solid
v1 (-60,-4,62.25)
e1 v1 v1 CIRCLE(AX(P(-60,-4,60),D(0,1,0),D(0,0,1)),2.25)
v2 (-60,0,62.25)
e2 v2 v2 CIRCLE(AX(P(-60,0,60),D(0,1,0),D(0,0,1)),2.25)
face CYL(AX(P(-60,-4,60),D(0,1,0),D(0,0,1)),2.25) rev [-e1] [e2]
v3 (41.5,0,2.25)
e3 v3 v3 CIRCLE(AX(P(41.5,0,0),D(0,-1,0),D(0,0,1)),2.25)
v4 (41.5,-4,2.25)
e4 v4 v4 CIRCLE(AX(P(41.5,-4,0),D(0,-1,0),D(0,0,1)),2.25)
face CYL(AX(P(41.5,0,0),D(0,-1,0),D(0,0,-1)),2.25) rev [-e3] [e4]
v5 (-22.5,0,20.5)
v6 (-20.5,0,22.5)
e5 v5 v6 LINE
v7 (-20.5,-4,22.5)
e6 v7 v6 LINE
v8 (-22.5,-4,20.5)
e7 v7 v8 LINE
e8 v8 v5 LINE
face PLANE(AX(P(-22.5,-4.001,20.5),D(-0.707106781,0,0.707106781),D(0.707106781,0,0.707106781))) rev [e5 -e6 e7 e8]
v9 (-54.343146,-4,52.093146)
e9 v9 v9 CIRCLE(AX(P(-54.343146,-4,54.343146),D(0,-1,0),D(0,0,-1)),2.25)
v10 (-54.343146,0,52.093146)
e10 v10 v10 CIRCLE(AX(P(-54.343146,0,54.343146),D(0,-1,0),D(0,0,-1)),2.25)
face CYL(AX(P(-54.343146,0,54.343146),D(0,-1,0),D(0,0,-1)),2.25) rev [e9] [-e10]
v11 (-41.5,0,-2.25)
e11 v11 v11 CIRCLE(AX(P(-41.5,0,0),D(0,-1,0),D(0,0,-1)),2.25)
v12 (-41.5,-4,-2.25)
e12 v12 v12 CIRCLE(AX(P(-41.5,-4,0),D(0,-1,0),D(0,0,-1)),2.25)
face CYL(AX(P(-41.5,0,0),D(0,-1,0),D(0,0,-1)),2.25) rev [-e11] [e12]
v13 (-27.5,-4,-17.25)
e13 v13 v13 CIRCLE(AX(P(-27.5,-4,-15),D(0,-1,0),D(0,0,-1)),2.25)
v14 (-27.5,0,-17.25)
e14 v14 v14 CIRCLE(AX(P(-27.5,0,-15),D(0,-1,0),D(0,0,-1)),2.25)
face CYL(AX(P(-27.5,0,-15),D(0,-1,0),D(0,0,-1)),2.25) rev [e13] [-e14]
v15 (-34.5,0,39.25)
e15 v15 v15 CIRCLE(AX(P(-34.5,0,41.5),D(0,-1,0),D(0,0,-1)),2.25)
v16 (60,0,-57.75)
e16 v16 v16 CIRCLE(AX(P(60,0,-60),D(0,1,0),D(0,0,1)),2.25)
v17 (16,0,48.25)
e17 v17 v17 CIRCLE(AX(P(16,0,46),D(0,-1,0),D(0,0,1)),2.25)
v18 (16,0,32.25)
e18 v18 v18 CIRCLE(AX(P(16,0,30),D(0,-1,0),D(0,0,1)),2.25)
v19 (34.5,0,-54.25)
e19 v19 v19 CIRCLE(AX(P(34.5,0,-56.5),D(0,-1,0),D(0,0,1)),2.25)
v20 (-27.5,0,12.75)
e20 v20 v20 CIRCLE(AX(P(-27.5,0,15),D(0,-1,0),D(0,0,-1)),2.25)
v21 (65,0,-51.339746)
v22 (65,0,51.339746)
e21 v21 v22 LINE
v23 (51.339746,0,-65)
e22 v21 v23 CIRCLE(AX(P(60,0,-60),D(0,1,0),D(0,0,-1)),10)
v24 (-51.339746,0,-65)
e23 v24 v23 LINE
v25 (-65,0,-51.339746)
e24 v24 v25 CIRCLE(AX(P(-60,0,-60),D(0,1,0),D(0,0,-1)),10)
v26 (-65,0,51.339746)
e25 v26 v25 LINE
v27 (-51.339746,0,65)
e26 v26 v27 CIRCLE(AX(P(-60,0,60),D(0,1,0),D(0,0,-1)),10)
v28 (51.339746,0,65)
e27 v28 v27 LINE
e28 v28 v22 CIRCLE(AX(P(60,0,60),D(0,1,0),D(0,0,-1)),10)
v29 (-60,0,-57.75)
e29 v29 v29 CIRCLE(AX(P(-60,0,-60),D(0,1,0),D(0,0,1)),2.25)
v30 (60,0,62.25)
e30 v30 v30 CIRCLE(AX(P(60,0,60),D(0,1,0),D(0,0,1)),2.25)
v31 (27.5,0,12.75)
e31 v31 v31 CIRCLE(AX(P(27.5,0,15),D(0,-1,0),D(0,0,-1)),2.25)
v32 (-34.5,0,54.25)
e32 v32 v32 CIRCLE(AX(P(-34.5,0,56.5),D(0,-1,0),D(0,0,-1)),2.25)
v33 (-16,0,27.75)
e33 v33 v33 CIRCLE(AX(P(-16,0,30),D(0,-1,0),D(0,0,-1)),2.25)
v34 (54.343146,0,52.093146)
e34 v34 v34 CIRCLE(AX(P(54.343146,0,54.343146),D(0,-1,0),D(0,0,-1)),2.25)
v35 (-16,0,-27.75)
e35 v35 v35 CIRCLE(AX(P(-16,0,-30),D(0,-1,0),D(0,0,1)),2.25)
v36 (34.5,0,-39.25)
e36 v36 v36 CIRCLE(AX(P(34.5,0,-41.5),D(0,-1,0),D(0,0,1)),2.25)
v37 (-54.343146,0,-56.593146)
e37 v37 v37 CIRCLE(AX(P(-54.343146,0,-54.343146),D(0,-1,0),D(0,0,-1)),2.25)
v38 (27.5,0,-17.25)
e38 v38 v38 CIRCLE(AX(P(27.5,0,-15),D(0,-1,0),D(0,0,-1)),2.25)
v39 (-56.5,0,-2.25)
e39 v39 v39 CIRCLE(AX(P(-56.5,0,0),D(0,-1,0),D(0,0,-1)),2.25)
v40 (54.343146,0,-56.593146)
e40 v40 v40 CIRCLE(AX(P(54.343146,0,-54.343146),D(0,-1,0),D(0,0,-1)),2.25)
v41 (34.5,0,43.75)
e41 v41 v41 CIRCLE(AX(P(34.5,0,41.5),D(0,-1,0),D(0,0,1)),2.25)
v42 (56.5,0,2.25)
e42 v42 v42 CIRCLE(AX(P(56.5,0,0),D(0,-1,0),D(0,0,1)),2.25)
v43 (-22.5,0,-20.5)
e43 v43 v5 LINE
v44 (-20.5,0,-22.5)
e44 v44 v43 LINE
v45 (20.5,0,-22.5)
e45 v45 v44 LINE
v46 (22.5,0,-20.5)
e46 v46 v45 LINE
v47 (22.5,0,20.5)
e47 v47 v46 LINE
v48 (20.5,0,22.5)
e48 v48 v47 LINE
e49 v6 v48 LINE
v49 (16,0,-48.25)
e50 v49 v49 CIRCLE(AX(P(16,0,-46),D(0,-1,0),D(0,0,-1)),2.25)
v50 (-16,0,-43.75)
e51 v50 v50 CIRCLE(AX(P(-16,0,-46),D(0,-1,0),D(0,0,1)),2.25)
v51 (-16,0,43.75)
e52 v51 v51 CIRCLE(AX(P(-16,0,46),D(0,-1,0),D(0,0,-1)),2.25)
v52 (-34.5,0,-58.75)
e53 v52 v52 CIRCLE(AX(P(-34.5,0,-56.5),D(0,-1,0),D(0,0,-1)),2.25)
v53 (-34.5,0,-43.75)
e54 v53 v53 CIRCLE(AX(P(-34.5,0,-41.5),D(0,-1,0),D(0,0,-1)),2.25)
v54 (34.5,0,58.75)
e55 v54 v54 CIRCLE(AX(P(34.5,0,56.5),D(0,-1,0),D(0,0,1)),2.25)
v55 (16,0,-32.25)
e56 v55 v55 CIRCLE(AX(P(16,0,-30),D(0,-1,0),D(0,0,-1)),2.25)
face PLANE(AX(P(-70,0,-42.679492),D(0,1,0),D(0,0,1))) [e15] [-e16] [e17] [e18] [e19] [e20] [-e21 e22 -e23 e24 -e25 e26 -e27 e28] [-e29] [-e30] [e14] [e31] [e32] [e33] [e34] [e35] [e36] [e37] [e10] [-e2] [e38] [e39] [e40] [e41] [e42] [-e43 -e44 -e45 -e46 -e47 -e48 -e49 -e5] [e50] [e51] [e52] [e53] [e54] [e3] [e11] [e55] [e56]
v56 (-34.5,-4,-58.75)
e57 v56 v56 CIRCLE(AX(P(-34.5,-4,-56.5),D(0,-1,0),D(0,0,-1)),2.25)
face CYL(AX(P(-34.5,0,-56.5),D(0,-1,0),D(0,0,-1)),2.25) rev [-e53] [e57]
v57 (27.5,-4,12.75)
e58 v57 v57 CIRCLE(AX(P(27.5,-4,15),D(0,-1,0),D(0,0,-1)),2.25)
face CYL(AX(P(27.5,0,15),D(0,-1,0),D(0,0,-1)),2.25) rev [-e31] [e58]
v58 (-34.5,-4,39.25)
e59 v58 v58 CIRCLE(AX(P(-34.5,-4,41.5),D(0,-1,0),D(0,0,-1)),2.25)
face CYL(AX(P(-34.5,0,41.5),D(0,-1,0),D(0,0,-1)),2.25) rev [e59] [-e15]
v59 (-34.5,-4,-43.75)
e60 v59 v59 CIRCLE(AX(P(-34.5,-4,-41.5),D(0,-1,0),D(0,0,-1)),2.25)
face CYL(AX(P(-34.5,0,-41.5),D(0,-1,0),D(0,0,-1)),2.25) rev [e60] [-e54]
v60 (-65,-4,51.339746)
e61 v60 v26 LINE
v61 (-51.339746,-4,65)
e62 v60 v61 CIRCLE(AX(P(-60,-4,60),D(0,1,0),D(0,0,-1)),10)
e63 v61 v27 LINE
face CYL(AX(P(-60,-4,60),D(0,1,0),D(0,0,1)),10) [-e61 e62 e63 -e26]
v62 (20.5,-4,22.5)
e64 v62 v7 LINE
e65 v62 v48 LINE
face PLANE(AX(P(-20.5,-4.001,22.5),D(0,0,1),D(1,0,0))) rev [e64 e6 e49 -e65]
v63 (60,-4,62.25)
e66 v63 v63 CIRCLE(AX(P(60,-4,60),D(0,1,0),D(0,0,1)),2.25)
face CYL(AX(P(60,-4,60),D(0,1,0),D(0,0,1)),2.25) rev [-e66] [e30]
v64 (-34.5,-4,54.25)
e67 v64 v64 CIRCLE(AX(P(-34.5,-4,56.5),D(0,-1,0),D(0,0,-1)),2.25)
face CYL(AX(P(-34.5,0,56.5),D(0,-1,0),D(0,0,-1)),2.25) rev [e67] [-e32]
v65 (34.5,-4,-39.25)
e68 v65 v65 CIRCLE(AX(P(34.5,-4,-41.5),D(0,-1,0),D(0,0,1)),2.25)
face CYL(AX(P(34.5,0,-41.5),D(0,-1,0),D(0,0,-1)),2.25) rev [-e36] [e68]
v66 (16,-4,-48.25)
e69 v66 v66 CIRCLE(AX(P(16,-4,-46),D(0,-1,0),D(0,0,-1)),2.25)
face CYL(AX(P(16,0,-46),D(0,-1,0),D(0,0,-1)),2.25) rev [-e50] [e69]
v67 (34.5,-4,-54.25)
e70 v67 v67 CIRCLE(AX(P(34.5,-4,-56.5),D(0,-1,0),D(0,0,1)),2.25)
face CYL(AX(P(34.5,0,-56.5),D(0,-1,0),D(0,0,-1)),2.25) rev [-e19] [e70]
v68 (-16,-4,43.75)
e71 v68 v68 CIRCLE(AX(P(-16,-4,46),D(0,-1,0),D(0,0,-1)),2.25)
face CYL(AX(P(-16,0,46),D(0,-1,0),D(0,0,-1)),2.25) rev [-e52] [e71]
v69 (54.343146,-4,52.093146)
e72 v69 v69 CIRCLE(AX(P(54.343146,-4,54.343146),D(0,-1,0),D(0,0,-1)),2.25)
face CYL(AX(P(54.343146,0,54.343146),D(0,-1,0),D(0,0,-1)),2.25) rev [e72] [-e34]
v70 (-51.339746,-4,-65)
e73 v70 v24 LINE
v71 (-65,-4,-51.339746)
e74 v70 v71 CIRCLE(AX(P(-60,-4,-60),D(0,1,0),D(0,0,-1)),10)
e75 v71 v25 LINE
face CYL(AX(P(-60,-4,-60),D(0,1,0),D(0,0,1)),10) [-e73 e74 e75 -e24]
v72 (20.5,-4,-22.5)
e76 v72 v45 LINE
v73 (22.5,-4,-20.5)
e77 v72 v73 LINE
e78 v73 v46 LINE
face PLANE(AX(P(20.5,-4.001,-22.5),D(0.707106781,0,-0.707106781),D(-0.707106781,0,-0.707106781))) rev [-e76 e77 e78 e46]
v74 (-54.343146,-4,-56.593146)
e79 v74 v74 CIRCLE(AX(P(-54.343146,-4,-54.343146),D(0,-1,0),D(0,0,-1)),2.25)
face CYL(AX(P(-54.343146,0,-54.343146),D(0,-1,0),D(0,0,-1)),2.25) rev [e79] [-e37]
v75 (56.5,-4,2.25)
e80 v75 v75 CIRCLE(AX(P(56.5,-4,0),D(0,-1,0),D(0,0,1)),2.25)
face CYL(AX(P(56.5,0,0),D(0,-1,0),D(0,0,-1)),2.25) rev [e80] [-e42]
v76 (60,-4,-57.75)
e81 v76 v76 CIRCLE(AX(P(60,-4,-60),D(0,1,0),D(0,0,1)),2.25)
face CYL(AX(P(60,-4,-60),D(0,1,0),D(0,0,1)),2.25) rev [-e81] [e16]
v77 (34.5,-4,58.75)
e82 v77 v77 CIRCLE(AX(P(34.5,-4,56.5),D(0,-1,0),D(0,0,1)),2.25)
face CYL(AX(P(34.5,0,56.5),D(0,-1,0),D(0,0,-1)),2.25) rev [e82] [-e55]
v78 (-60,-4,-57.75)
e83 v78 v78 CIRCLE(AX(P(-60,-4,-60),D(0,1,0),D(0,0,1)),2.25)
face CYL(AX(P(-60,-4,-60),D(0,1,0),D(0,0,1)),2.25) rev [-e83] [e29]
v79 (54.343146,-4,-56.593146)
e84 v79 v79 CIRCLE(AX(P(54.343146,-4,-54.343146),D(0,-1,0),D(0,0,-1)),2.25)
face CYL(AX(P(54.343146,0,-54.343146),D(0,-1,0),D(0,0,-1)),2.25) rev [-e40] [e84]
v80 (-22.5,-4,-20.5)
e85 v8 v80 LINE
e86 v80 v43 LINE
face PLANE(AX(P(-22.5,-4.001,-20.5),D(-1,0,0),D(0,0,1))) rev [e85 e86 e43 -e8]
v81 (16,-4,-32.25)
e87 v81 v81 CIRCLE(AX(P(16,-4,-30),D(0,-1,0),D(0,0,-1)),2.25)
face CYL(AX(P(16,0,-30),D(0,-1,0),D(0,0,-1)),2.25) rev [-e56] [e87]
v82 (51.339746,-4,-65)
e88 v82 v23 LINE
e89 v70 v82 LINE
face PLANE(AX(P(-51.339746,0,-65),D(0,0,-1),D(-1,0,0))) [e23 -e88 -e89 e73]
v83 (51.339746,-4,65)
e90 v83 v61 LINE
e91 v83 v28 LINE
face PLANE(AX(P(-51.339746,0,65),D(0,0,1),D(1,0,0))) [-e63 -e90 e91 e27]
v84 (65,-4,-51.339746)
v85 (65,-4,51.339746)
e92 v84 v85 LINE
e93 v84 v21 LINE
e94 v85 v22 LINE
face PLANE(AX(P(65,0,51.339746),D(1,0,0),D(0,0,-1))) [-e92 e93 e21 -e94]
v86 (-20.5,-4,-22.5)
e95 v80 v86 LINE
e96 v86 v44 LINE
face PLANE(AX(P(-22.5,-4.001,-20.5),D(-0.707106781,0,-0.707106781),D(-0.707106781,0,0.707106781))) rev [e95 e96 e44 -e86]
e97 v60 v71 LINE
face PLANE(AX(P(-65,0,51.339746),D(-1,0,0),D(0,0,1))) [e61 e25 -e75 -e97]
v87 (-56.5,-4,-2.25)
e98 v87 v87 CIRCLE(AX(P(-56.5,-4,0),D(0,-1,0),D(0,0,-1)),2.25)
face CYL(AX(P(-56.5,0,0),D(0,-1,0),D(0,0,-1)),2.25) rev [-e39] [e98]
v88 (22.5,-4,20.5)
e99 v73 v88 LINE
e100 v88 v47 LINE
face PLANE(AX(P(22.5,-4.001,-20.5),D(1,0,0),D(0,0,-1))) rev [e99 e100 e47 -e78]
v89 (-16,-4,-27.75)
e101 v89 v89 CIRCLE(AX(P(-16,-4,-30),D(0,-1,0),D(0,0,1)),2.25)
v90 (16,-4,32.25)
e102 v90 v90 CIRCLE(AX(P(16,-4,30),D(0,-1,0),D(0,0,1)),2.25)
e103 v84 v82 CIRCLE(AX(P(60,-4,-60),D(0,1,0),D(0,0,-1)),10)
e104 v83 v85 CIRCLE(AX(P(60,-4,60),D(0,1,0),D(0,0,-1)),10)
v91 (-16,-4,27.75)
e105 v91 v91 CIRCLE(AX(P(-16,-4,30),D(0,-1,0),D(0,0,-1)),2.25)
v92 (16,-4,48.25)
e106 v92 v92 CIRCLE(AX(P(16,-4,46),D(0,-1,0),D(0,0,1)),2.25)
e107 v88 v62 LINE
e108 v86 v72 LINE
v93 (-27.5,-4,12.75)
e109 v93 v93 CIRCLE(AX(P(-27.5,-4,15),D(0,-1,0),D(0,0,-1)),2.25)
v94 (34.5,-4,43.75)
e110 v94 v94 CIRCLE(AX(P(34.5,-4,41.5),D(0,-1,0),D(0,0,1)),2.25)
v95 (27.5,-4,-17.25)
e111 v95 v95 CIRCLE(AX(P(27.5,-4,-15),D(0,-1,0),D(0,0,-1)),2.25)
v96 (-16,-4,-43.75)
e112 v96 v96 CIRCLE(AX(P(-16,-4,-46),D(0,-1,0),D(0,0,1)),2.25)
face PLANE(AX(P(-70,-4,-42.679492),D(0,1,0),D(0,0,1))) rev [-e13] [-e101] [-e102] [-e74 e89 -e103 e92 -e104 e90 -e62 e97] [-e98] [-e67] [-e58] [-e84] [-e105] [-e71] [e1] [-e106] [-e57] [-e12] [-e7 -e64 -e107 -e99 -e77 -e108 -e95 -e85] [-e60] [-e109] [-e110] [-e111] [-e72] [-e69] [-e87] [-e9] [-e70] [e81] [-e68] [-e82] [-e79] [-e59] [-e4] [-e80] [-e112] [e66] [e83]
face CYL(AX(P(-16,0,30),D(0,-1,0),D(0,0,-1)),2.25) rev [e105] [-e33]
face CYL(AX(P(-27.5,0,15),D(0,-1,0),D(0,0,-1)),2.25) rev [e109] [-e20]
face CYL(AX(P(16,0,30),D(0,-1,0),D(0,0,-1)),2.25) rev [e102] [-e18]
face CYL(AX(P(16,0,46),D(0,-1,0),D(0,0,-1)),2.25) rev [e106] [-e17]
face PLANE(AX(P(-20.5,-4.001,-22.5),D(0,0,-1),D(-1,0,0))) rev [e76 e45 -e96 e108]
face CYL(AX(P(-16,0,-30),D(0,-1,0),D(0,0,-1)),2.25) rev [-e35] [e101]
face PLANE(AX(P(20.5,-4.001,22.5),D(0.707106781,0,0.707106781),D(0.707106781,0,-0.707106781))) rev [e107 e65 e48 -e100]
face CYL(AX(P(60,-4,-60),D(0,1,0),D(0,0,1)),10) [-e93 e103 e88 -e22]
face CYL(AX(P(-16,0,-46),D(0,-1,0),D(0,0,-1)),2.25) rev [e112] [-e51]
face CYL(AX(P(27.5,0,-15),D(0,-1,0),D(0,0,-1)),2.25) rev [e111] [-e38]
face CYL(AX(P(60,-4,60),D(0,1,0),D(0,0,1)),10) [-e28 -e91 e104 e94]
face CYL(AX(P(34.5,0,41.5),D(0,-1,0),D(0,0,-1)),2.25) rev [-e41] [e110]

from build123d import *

# Parameters (mm, degrees)
SKETCH1_R          = 2.25
BASE_FLANGE1_DEPTH = 4
CUT_EXTRUDE1_REACH = 101.076
SKETCH5_R          = 2.25
CUT_EXTRUDE2_DEPTH = 100.075728612
SKETCH6_R          = 2.25
CUT_EXTRUDE3_DEPTH = 100.075728612
SKETCH8_W          = 5
SKETCH8_H          = 102.679491924
SKETCH8_W_2        = 102.679491924
SKETCH8_H_2        = 5
TAB1_DEPTH         = 4
SKETCH7_R          = 2.25
CUT_EXTRUDE4_DEPTH = 100.075728612
SKETCH9_R          = 2.25
CUT_EXTRUDE5_DEPTH = 100.075728612


# Sheet-metal steps are written as plain solids
with BuildPart() as part:
    # Sketch1 → Base-Flange1 (new body)
    with BuildSketch(Plane(origin=(0, 0, 0), x_dir=(1, 0, 0), z_dir=(0, 1, 0))):
        with BuildLine():
            Line((-60, 0), (-60, 42.679491924))
            ThreePointArc((-60, 42.679491924), (-61.339745962, 47.679491924), (-65, 51.339745962))
            ThreePointArc((-65, 51.339745962), (-67.071067812, 67.071067812), (-51.339745962, 65))
            ThreePointArc((-51.339745962, 65), (-47.679491924, 61.339745962), (-42.679491924, 60))
            Line((-42.679491924, 60), (0, 60))
            Line((0, 60), (42.679491924, 60))
            ThreePointArc((42.679491924, 60), (47.679491924, 61.339745962), (51.339745962, 65))
            ThreePointArc((51.339745962, 65), (67.071067812, 67.071067812), (65, 51.339745962))
            ThreePointArc((65, 51.339745962), (61.339745962, 47.679491924), (60, 42.679491924))
            Line((60, 42.679491924), (60, 0))
            Line((60, 0), (60, -42.679491924))
            ThreePointArc((60, -42.679491924), (61.339745962, -47.679491924), (65, -51.339745962))
            ThreePointArc((65, -51.339745962), (67.071067812, -67.071067812), (51.339745962, -65))
            ThreePointArc((51.339745962, -65), (47.679491924, -61.339745962), (42.679491924, -60))
            Line((42.679491924, -60), (0, -60))
            Line((0, -60), (-42.679491924, -60))
            ThreePointArc((-42.679491924, -60), (-47.679491924, -61.339745962), (-51.339745962, -65))
            ThreePointArc((-51.339745962, -65), (-67.071067812, -67.071067812), (-65, -51.339745962))
            ThreePointArc((-65, -51.339745962), (-61.339745962, -47.679491924), (-60, -42.679491924))
            Line((-60, -42.679491924), (-60, 0))
        make_face()
        with Locations(Location((-60, 60, 0), (0, 0, 270))):
            Circle(SKETCH1_R, mode=Mode.SUBTRACT)
        with Locations(Location((60, 60, 0), (0, 0, 270))):
            Circle(SKETCH1_R, mode=Mode.SUBTRACT)
        with Locations(Location((60, -60, 0), (0, 0, 270))):
            Circle(SKETCH1_R, mode=Mode.SUBTRACT)
        with Locations(Location((-60, -60, 0), (0, 0, 270))):
            Circle(SKETCH1_R, mode=Mode.SUBTRACT)
    extrude(amount=-BASE_FLANGE1_DEPTH)

    # Sketch4 → Cut-Extrude1 (cut, up to next)
    with BuildSketch(Plane(origin=(0, 0, 0), x_dir=(1, 0, 0), z_dir=(0, 1, 0)), mode=Mode.PRIVATE) as cut_extrude1_sk1:
        Polygon((-20.5, 22.5), (20.5, 22.5), (22.5, 20.5), (22.5, -20.5), (20.5, -22.5), (-20.5, -22.5), (-22.5, -20.5), (-22.5, 20.5), align=None)
    cut_extrude1_tool1 = extrude(cut_extrude1_sk1.sketch, amount=-CUT_EXTRUDE1_REACH, mode=Mode.PRIVATE) & part.part
    add(cut_extrude1_tool1.solids().sort_by_distance((0, 0, 0))[0], mode=Mode.SUBTRACT)

    # Sketch5 → Cut-Extrude2 (cut, through all)
    with BuildSketch(Plane.XZ.offset(4)):
        with Locations(Location((-54.343145751, 54.343145751, 0), (0, 0, 270))):
            Circle(SKETCH5_R)
        with Locations(Location((54.343145751, 54.343145751, 0), (0, 0, 270))):
            Circle(SKETCH5_R)
        with Locations(Location((54.343145751, -54.343145751, 0), (0, 0, 270))):
            Circle(SKETCH5_R)
        with Locations(Location((-54.343145751, -54.343145751, 0), (0, 0, 270))):
            Circle(SKETCH5_R)
    extrude(amount=-CUT_EXTRUDE2_DEPTH, mode=Mode.SUBTRACT)

    # Sketch6 → Cut-Extrude3 (cut, through all)
    with BuildSketch(Plane.XZ.offset(4)):
        with Locations(Location((27.5, 15, 0), (0, 0, 270))):
            Circle(SKETCH6_R)
        with Locations(Location((27.5, -15, 0), (0, 0, 270))):
            Circle(SKETCH6_R)
        with Locations(Location((-27.5, -15, 0), (0, 0, 270))):
            Circle(SKETCH6_R)
        with Locations(Location((-27.5, 15, 0), (0, 0, 270))):
            Circle(SKETCH6_R)
    extrude(amount=-CUT_EXTRUDE3_DEPTH, mode=Mode.SUBTRACT)

    # Sketch8 → Tab1 (add)
    with BuildSketch(Plane.XZ.offset(4)):
        with Locations((-62.5, 0)):
            Rectangle(SKETCH8_W, SKETCH8_H)
        with Locations((0, -62.5)):
            Rectangle(SKETCH8_W_2, SKETCH8_H_2)
        with Locations((62.5, 0)):
            Rectangle(SKETCH8_W, SKETCH8_H)
        with Locations((0, 62.5)):
            Rectangle(SKETCH8_W_2, SKETCH8_H_2)
    extrude(amount=-TAB1_DEPTH)

    # Sketch7 → Cut-Extrude4 (cut, through all)
    with BuildSketch(Plane.XZ.offset(4)):
        with Locations(Location((-16, 46, 0), (0, 0, 270))):
            Circle(SKETCH7_R)
        with Locations(Location((-16, 30, 0), (0, 0, 270))):
            Circle(SKETCH7_R)
        with Locations(Location((16, 30, 0), (0, 0, 90))):
            Circle(SKETCH7_R)
        with Locations(Location((16, 46, 0), (0, 0, 90))):
            Circle(SKETCH7_R)
        with Locations(Location((16, -46, 0), (0, 0, 270))):
            Circle(SKETCH7_R)
        with Locations(Location((16, -30, 0), (0, 0, 270))):
            Circle(SKETCH7_R)
        with Locations(Location((-16, -30, 0), (0, 0, 90))):
            Circle(SKETCH7_R)
        with Locations(Location((-16, -46, 0), (0, 0, 90))):
            Circle(SKETCH7_R)
    extrude(amount=-CUT_EXTRUDE4_DEPTH, mode=Mode.SUBTRACT)

    # Sketch9 → Cut-Extrude5 (cut, through all)
    with BuildSketch(Plane.XZ.offset(4)):
        with Locations(Location((-34.5, 56.5, 0), (0, 0, 270))):
            Circle(SKETCH9_R)
        with Locations(Location((-34.5, 41.5, 0), (0, 0, 270))):
            Circle(SKETCH9_R)
        with Locations(Location((-56.5, 0, 0), (0, 0, 270))):
            Circle(SKETCH9_R)
        with Locations(Location((-41.5, 0, 0), (0, 0, 270))):
            Circle(SKETCH9_R)
        with Locations(Location((-34.5, -41.5, 0), (0, 0, 270))):
            Circle(SKETCH9_R)
        with Locations(Location((-34.5, -56.5, 0), (0, 0, 270))):
            Circle(SKETCH9_R)
        with Locations(Location((34.5, -56.5, 0), (0, 0, 90))):
            Circle(SKETCH9_R)
        with Locations(Location((34.5, -41.5, 0), (0, 0, 90))):
            Circle(SKETCH9_R)
        with Locations(Location((41.5, 0, 0), (0, 0, 90))):
            Circle(SKETCH9_R)
        with Locations(Location((56.5, 0, 0), (0, 0, 90))):
            Circle(SKETCH9_R)
        with Locations(Location((34.5, 41.5, 0), (0, 0, 90))):
            Circle(SKETCH9_R)
        with Locations(Location((34.5, 56.5, 0), (0, 0, 90))):
            Circle(SKETCH9_R)
    extrude(amount=-CUT_EXTRUDE5_DEPTH, mode=Mode.SUBTRACT)


solid = part.part
